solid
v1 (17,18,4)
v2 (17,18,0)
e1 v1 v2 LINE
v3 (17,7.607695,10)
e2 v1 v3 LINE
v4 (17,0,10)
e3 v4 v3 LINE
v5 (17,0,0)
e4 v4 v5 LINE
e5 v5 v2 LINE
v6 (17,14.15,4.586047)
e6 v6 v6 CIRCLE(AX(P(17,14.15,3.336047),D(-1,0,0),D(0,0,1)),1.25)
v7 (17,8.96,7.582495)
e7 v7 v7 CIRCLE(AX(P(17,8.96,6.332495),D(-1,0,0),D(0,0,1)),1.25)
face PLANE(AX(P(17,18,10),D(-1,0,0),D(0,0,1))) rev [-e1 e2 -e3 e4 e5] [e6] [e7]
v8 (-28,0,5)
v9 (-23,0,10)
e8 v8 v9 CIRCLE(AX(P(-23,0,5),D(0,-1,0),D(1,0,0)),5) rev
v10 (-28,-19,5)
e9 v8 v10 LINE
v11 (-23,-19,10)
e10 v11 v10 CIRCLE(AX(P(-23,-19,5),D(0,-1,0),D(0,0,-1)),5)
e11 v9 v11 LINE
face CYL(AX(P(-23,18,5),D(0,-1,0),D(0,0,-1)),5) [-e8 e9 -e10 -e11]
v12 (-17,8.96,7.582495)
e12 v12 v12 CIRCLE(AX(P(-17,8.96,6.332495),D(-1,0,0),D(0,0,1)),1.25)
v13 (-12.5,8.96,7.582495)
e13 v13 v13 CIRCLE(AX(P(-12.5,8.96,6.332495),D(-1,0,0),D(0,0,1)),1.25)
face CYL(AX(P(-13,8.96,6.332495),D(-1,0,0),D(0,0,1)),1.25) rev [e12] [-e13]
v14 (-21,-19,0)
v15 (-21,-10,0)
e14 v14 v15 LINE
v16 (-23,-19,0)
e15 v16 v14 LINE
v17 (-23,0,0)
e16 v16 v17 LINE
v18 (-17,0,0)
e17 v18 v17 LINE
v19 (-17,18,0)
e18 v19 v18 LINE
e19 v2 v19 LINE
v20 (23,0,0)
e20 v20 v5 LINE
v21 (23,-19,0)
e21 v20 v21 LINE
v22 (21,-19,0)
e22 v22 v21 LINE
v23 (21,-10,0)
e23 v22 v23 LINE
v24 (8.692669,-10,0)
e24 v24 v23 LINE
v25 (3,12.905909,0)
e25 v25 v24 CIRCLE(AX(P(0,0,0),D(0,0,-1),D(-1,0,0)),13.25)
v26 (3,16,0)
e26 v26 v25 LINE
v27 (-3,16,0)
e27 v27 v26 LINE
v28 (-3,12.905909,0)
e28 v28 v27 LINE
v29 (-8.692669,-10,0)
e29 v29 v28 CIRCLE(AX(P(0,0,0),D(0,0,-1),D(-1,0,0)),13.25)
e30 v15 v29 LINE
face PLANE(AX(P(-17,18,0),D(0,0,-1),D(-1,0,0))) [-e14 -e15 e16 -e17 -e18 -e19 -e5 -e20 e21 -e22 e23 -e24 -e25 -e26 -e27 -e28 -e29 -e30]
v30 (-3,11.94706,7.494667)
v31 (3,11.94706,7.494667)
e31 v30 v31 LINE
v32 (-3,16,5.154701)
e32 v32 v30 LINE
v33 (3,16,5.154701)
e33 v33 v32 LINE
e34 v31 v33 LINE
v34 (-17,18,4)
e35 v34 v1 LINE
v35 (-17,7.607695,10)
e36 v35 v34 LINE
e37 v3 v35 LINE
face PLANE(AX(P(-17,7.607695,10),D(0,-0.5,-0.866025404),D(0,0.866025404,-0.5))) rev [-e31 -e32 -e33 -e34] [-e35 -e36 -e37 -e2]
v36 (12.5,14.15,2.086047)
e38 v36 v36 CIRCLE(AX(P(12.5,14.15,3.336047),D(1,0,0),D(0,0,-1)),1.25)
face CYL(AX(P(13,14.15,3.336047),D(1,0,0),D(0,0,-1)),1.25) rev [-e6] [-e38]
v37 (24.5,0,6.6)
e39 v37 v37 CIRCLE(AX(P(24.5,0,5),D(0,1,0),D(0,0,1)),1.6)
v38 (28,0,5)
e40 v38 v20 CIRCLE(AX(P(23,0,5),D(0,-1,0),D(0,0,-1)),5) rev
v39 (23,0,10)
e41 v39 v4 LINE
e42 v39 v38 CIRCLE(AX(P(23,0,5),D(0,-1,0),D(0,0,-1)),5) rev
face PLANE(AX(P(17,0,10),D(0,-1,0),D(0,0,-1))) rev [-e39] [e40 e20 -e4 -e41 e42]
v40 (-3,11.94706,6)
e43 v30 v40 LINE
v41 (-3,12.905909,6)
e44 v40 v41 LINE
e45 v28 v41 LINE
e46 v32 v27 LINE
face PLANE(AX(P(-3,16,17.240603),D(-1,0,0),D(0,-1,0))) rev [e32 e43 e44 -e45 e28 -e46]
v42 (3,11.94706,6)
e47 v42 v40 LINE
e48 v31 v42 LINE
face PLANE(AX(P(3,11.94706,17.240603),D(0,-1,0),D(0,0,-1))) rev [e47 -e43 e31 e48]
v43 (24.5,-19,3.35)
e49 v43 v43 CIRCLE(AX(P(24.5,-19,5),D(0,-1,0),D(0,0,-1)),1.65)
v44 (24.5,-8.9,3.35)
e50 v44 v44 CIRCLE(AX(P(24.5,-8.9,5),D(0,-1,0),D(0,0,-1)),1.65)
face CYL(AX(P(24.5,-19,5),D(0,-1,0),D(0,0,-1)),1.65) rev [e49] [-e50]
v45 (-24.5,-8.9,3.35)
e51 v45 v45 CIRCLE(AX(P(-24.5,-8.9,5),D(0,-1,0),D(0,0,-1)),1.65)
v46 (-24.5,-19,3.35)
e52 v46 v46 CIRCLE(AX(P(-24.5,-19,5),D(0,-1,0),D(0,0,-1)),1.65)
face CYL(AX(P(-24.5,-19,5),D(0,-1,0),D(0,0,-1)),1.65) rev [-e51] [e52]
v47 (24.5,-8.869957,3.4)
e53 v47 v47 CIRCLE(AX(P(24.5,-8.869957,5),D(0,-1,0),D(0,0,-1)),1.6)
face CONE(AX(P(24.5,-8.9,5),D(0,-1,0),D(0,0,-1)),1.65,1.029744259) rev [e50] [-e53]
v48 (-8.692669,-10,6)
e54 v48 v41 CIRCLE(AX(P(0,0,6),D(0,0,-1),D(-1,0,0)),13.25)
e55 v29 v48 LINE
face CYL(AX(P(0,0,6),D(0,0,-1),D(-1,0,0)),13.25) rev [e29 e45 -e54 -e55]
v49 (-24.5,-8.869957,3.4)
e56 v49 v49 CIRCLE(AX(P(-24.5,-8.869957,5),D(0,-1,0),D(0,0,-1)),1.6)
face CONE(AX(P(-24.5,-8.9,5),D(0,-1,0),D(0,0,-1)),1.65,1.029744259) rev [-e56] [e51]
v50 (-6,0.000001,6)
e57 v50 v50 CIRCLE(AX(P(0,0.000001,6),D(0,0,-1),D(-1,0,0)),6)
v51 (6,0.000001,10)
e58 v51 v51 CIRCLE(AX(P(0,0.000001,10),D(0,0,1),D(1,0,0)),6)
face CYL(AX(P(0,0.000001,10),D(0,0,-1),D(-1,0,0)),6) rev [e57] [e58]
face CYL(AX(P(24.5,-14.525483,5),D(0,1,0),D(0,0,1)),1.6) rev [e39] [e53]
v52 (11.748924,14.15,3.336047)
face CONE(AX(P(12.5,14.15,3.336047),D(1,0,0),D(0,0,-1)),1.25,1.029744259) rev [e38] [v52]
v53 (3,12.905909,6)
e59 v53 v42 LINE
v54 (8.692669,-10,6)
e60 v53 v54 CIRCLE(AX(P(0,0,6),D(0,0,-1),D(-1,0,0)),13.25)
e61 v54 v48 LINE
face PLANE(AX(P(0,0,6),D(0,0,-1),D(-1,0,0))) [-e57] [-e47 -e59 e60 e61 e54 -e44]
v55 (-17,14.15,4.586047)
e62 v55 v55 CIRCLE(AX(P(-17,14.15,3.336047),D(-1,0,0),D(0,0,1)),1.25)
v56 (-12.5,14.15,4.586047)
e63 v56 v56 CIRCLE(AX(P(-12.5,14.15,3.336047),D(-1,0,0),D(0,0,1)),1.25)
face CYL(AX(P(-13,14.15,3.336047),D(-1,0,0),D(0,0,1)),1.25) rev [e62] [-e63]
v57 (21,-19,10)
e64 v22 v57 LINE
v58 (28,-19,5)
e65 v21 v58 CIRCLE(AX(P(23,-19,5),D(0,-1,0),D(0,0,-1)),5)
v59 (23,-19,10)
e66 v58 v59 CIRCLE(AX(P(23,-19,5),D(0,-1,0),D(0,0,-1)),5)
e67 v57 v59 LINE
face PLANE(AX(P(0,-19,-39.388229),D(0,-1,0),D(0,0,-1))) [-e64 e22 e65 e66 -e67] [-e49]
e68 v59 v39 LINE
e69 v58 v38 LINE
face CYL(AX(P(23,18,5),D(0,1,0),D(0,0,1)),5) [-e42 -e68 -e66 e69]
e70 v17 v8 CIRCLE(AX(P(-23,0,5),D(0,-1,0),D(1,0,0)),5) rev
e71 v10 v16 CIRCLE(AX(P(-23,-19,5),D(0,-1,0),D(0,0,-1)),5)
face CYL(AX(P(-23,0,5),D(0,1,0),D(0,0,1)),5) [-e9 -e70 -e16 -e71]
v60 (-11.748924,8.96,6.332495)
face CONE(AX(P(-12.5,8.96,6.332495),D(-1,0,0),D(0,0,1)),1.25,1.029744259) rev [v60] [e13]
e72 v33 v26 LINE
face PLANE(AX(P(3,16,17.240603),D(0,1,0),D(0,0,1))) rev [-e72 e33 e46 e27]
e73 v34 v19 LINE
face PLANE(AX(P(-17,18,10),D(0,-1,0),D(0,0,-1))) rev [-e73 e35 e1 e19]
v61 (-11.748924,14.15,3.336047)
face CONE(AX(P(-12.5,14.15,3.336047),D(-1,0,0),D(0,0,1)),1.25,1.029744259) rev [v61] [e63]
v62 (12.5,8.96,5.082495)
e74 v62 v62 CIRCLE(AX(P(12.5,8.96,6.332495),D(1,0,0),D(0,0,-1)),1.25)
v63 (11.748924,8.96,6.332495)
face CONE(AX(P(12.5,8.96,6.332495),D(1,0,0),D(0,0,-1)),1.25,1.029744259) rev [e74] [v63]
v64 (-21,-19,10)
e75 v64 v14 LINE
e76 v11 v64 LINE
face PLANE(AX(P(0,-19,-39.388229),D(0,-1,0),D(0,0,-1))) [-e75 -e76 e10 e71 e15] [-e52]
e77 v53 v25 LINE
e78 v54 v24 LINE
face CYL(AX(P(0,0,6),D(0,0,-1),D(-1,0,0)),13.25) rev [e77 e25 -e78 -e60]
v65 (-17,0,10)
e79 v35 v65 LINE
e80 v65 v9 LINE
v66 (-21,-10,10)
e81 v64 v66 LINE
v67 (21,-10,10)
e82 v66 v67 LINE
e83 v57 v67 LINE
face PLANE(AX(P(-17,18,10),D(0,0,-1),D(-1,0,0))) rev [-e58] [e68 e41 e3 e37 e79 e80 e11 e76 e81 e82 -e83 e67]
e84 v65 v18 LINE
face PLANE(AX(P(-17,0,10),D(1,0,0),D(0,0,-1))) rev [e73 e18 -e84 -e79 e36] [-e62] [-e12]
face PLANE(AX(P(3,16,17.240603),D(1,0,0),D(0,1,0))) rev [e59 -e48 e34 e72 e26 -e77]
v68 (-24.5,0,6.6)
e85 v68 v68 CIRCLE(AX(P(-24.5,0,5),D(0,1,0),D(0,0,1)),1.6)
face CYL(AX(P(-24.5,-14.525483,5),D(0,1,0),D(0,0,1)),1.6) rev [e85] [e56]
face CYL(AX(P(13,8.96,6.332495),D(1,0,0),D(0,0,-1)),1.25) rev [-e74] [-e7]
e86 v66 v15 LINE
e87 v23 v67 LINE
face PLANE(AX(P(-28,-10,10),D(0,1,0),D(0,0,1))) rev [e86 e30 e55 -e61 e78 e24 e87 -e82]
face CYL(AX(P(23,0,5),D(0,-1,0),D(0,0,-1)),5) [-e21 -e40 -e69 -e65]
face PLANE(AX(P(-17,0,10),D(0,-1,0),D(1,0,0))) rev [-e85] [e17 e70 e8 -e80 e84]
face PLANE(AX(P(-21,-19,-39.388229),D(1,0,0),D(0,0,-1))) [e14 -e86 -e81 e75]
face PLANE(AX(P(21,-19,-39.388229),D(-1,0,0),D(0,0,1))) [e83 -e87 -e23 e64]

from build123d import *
from build123d.topology import SkipClean

# Parameters (mm, degrees)
SKETCH1_R                   = 6
EXTRUDE1_DEPTH              = 10
SKETCH2_R                   = 13.25
CUT_EXTRUDE1_DEPTH          = 6
SKETCH3_R                   = 1.6
CUT_EXTRUDE2_DEPTH          = 10
SKETCH4_W                   = 7
SKETCH4_H                   = 10
SKETCH4_R                   = 1.6
EXTRUDE3_DEPTH              = 9
FILLET2_R                   = 5
CHAMFER4_SIZE               = 6
CHAMFER4_SIZE2              = 10.392304845
M4_TAPPED_HOLE1_D           = 3.3
M4_TAPPED_HOLE1_DEPTH       = 10.1
M4_TAPPED_HOLE1_TIP         = 0.991420021
SKETCH6_R                   = 1.25
EXTRUDE4_DEPTH              = 4
M3_START                    = 12.4999999
M3_TAPPED_HOLE1_OUTLINE_R   = 1.25
M3_TAPPED_HOLE1_DEPTH       = 0.5000001
M3_START_2                  = -13
M3_TAPPED_HOLE1_2_OUTLINE_R = 1.25
M3_TAPPED_HOLE1_2_DEPTH     = 0.4999999
EXTRUDE5_REACH              = 37.285
SKETCH8_W                   = 6
SKETCH8_H                   = 4.052940251


with BuildPart() as part:
    # Sketch1 → Extrude1 (new body)
    with BuildSketch(Plane.XY):
        Polygon((-17, 0), (-28, 0), (-28, -10), (28, -10), (28, 0), (17, 0), (17, 18), (-17, 18), align=None)
        with Locations((0, 6.53e-07)):
            Circle(SKETCH1_R, mode=Mode.SUBTRACT)
    extrude(amount=EXTRUDE1_DEPTH)

    # Sketch2 → Cut-Extrude1 (cut)
    with BuildSketch(Plane(origin=(0, 0, 0), x_dir=(-1, 0, 0), z_dir=(0, 0, -1))):
        Circle(SKETCH2_R)
    extrude(amount=-CUT_EXTRUDE1_DEPTH, mode=Mode.SUBTRACT)

    # Sketch3 → Cut-Extrude2 (cut)
    with BuildSketch(Plane(origin=(0, 0, 0), x_dir=(-1, 0, 0), z_dir=(0, 1, 0))):
        with Locations(Location((-24.5, 5, 0), (0, 0, 90))):
            Circle(SKETCH3_R)
        with Locations(Location((24.5, 5, 0), (0, 0, 90))):
            Circle(SKETCH3_R)
    extrude(amount=-CUT_EXTRUDE2_DEPTH, mode=Mode.SUBTRACT)

    # Sketch4 → Extrude3 (add)
    # profile 1 of 2: a face of its own
    with SkipClean():  # the faces are left unmerged after this step: merging them gives an invalid solid
        with BuildSketch(Plane.XZ.offset(10)):
            with Locations((-24.5, 5)):
                Rectangle(SKETCH4_W, SKETCH4_H)
            with Locations((-24.5, 5)):
                Circle(SKETCH4_R, mode=Mode.SUBTRACT)
        # profile 2 of 2: a face of its own
        with BuildSketch(Plane.XZ.offset(10)):
            with Locations((24.5, 5)):
                Rectangle(SKETCH4_W, SKETCH4_H)
            with Locations((24.5, 5)):
                Circle(SKETCH4_R, mode=Mode.SUBTRACT)
        extrude(amount=EXTRUDE3_DEPTH)
    add(part.part.scale(1), mode=Mode.REPLACE)  # the faces are merged on a copy

    # Fillet2
    fillet2_edges = [part.edges().sort_by_distance(p)[0] for p in [
        (28, -5, 0),
        (28, -5, 10),
        (-28, -9.5, 0),
        (-28, -9.5, 10),
    ]]
    fillet(fillet2_edges, radius=FILLET2_R - 0.0001)  # a hair under: the kernel refuses the full size

    # Chamfer4
    chamfer4_edges = [part.edges().sort_by_distance(p)[0] for p in [
        (0, 18, 10),
    ]]
    chamfer4_side = [part.faces().sort_by_distance(p)[0] for p in [
        (0, 18, 5),
    ]]
    chamfer(chamfer4_edges, length=CHAMFER4_SIZE, length2=CHAMFER4_SIZE2, reference=chamfer4_side[0])

    # M4 Tapped Hole1
    with Locations(Plane(origin=(-24.5, -19, 5), x_dir=(0, 0, -1), z_dir=(0, -1, 0))):
        with Locations((0, 0), (0, 49)):
            Hole(M4_TAPPED_HOLE1_D / 2, depth=M4_TAPPED_HOLE1_DEPTH)
            with Locations((0, 0, -(M4_TAPPED_HOLE1_DEPTH + M4_TAPPED_HOLE1_TIP / 2))):  # 118° drill point
                Cone(0, M4_TAPPED_HOLE1_D / 2, M4_TAPPED_HOLE1_TIP, mode=Mode.SUBTRACT)

    # Sketch6 → Extrude4 (cut)
    with BuildSketch(Plane.ZY.offset(17)):
        with Locations((3.33604719, 14.15)):
            Circle(SKETCH6_R)
        with Locations((6.332495088, 8.96)):
            Circle(SKETCH6_R)
    extrude4 = extrude(amount=-EXTRUDE4_DEPTH, mode=Mode.SUBTRACT)

    # Mirror1: Extrude4 across plane
    add(extrude4.mirror(Plane(origin=(0, 0, 0), x_dir=(0, 0, 1), z_dir=(1, 0, 0))), mode=Mode.SUBTRACT)

    # M3 Tapped Hole1: read off the stored shape, not the designer's step
    # M3 Tapped Hole1 outline → M3 Tapped Hole1 (cut)
    with BuildSketch(Plane.YZ.offset(M3_START)):
        with Locations((14.15, 3.33604719)):
            Circle(M3_TAPPED_HOLE1_OUTLINE_R)
        with Locations((8.96, 6.332495088)):
            Circle(M3_TAPPED_HOLE1_OUTLINE_R)
    extrude(amount=M3_TAPPED_HOLE1_DEPTH, mode=Mode.SUBTRACT)

    # M3 Tapped Hole1 2 outline → M3 Tapped Hole1 2 (cut)
    with BuildSketch(Plane.YZ.offset(M3_START_2)):
        with Locations((14.15, 3.33604719)):
            Circle(M3_TAPPED_HOLE1_2_OUTLINE_R)
        with Locations((8.96, 6.332495088)):
            Circle(M3_TAPPED_HOLE1_2_OUTLINE_R)
    extrude(amount=M3_TAPPED_HOLE1_2_DEPTH, mode=Mode.SUBTRACT)

    # M3 Tapped Hole1 3 outline → M3 Tapped Hole1 3 (revolve, cut)
    with BuildSketch(Plane(origin=(0, 14.15, 3.33604719), x_dir=(0, 1, 0), z_dir=(0, 0, -1))):
        Polygon((0, 12.5), (0, 11.748924226), (1.25, 12.5), align=None)
        Polygon((1.25, -12.5), (0, -11.748924226), (0, -12.5000001), align=None)
    revolve(axis=Axis((0, 14.15, 3.33604719), (1, 0, 0)), mode=Mode.SUBTRACT)

    # M3 Tapped Hole1 4 outline → M3 Tapped Hole1 4 (revolve, cut)
    with BuildSketch(Plane(origin=(0, 8.96, 6.332495088), x_dir=(0, 1, 0), z_dir=(0, 0, -1))):
        Polygon((0, 12.5), (0, 11.748924226), (1.25, 12.5), align=None)
        Polygon((1.25, -12.5), (0, -11.748924226), (0, -12.5000001), align=None)
    revolve(axis=Axis((0, 8.96, 6.332495088), (1, 0, 0)), mode=Mode.SUBTRACT)

    # Extrude5: up to this face of the body (flat: up to its plane)
    extrude5_end = Plane(part.part.faces().sort_by_distance((-16.468587934, 3.803847577, 10))[0])
    # Sketch8 → Extrude5 (cut, up to the picked face)
    with BuildSketch(Plane(origin=(0, 0, 0), x_dir=(-1, 0, 0), z_dir=(0, 0, -1)), mode=Mode.PRIVATE) as extrude5_sk1:
        with Locations((0, 13.973529875)):
            Rectangle(SKETCH8_W, SKETCH8_H)
    extrude5_tool1 = split(extrude(extrude5_sk1.sketch, amount=-EXTRUDE5_REACH, mode=Mode.PRIVATE), bisect_by=extrude5_end, keep=Keep.BOTH, mode=Mode.PRIVATE)
    add(extrude5_tool1.solids().sort_by(Axis((0, 13.97353, 0), (0, 0, 1)))[0], mode=Mode.SUBTRACT)


solid = part.part
